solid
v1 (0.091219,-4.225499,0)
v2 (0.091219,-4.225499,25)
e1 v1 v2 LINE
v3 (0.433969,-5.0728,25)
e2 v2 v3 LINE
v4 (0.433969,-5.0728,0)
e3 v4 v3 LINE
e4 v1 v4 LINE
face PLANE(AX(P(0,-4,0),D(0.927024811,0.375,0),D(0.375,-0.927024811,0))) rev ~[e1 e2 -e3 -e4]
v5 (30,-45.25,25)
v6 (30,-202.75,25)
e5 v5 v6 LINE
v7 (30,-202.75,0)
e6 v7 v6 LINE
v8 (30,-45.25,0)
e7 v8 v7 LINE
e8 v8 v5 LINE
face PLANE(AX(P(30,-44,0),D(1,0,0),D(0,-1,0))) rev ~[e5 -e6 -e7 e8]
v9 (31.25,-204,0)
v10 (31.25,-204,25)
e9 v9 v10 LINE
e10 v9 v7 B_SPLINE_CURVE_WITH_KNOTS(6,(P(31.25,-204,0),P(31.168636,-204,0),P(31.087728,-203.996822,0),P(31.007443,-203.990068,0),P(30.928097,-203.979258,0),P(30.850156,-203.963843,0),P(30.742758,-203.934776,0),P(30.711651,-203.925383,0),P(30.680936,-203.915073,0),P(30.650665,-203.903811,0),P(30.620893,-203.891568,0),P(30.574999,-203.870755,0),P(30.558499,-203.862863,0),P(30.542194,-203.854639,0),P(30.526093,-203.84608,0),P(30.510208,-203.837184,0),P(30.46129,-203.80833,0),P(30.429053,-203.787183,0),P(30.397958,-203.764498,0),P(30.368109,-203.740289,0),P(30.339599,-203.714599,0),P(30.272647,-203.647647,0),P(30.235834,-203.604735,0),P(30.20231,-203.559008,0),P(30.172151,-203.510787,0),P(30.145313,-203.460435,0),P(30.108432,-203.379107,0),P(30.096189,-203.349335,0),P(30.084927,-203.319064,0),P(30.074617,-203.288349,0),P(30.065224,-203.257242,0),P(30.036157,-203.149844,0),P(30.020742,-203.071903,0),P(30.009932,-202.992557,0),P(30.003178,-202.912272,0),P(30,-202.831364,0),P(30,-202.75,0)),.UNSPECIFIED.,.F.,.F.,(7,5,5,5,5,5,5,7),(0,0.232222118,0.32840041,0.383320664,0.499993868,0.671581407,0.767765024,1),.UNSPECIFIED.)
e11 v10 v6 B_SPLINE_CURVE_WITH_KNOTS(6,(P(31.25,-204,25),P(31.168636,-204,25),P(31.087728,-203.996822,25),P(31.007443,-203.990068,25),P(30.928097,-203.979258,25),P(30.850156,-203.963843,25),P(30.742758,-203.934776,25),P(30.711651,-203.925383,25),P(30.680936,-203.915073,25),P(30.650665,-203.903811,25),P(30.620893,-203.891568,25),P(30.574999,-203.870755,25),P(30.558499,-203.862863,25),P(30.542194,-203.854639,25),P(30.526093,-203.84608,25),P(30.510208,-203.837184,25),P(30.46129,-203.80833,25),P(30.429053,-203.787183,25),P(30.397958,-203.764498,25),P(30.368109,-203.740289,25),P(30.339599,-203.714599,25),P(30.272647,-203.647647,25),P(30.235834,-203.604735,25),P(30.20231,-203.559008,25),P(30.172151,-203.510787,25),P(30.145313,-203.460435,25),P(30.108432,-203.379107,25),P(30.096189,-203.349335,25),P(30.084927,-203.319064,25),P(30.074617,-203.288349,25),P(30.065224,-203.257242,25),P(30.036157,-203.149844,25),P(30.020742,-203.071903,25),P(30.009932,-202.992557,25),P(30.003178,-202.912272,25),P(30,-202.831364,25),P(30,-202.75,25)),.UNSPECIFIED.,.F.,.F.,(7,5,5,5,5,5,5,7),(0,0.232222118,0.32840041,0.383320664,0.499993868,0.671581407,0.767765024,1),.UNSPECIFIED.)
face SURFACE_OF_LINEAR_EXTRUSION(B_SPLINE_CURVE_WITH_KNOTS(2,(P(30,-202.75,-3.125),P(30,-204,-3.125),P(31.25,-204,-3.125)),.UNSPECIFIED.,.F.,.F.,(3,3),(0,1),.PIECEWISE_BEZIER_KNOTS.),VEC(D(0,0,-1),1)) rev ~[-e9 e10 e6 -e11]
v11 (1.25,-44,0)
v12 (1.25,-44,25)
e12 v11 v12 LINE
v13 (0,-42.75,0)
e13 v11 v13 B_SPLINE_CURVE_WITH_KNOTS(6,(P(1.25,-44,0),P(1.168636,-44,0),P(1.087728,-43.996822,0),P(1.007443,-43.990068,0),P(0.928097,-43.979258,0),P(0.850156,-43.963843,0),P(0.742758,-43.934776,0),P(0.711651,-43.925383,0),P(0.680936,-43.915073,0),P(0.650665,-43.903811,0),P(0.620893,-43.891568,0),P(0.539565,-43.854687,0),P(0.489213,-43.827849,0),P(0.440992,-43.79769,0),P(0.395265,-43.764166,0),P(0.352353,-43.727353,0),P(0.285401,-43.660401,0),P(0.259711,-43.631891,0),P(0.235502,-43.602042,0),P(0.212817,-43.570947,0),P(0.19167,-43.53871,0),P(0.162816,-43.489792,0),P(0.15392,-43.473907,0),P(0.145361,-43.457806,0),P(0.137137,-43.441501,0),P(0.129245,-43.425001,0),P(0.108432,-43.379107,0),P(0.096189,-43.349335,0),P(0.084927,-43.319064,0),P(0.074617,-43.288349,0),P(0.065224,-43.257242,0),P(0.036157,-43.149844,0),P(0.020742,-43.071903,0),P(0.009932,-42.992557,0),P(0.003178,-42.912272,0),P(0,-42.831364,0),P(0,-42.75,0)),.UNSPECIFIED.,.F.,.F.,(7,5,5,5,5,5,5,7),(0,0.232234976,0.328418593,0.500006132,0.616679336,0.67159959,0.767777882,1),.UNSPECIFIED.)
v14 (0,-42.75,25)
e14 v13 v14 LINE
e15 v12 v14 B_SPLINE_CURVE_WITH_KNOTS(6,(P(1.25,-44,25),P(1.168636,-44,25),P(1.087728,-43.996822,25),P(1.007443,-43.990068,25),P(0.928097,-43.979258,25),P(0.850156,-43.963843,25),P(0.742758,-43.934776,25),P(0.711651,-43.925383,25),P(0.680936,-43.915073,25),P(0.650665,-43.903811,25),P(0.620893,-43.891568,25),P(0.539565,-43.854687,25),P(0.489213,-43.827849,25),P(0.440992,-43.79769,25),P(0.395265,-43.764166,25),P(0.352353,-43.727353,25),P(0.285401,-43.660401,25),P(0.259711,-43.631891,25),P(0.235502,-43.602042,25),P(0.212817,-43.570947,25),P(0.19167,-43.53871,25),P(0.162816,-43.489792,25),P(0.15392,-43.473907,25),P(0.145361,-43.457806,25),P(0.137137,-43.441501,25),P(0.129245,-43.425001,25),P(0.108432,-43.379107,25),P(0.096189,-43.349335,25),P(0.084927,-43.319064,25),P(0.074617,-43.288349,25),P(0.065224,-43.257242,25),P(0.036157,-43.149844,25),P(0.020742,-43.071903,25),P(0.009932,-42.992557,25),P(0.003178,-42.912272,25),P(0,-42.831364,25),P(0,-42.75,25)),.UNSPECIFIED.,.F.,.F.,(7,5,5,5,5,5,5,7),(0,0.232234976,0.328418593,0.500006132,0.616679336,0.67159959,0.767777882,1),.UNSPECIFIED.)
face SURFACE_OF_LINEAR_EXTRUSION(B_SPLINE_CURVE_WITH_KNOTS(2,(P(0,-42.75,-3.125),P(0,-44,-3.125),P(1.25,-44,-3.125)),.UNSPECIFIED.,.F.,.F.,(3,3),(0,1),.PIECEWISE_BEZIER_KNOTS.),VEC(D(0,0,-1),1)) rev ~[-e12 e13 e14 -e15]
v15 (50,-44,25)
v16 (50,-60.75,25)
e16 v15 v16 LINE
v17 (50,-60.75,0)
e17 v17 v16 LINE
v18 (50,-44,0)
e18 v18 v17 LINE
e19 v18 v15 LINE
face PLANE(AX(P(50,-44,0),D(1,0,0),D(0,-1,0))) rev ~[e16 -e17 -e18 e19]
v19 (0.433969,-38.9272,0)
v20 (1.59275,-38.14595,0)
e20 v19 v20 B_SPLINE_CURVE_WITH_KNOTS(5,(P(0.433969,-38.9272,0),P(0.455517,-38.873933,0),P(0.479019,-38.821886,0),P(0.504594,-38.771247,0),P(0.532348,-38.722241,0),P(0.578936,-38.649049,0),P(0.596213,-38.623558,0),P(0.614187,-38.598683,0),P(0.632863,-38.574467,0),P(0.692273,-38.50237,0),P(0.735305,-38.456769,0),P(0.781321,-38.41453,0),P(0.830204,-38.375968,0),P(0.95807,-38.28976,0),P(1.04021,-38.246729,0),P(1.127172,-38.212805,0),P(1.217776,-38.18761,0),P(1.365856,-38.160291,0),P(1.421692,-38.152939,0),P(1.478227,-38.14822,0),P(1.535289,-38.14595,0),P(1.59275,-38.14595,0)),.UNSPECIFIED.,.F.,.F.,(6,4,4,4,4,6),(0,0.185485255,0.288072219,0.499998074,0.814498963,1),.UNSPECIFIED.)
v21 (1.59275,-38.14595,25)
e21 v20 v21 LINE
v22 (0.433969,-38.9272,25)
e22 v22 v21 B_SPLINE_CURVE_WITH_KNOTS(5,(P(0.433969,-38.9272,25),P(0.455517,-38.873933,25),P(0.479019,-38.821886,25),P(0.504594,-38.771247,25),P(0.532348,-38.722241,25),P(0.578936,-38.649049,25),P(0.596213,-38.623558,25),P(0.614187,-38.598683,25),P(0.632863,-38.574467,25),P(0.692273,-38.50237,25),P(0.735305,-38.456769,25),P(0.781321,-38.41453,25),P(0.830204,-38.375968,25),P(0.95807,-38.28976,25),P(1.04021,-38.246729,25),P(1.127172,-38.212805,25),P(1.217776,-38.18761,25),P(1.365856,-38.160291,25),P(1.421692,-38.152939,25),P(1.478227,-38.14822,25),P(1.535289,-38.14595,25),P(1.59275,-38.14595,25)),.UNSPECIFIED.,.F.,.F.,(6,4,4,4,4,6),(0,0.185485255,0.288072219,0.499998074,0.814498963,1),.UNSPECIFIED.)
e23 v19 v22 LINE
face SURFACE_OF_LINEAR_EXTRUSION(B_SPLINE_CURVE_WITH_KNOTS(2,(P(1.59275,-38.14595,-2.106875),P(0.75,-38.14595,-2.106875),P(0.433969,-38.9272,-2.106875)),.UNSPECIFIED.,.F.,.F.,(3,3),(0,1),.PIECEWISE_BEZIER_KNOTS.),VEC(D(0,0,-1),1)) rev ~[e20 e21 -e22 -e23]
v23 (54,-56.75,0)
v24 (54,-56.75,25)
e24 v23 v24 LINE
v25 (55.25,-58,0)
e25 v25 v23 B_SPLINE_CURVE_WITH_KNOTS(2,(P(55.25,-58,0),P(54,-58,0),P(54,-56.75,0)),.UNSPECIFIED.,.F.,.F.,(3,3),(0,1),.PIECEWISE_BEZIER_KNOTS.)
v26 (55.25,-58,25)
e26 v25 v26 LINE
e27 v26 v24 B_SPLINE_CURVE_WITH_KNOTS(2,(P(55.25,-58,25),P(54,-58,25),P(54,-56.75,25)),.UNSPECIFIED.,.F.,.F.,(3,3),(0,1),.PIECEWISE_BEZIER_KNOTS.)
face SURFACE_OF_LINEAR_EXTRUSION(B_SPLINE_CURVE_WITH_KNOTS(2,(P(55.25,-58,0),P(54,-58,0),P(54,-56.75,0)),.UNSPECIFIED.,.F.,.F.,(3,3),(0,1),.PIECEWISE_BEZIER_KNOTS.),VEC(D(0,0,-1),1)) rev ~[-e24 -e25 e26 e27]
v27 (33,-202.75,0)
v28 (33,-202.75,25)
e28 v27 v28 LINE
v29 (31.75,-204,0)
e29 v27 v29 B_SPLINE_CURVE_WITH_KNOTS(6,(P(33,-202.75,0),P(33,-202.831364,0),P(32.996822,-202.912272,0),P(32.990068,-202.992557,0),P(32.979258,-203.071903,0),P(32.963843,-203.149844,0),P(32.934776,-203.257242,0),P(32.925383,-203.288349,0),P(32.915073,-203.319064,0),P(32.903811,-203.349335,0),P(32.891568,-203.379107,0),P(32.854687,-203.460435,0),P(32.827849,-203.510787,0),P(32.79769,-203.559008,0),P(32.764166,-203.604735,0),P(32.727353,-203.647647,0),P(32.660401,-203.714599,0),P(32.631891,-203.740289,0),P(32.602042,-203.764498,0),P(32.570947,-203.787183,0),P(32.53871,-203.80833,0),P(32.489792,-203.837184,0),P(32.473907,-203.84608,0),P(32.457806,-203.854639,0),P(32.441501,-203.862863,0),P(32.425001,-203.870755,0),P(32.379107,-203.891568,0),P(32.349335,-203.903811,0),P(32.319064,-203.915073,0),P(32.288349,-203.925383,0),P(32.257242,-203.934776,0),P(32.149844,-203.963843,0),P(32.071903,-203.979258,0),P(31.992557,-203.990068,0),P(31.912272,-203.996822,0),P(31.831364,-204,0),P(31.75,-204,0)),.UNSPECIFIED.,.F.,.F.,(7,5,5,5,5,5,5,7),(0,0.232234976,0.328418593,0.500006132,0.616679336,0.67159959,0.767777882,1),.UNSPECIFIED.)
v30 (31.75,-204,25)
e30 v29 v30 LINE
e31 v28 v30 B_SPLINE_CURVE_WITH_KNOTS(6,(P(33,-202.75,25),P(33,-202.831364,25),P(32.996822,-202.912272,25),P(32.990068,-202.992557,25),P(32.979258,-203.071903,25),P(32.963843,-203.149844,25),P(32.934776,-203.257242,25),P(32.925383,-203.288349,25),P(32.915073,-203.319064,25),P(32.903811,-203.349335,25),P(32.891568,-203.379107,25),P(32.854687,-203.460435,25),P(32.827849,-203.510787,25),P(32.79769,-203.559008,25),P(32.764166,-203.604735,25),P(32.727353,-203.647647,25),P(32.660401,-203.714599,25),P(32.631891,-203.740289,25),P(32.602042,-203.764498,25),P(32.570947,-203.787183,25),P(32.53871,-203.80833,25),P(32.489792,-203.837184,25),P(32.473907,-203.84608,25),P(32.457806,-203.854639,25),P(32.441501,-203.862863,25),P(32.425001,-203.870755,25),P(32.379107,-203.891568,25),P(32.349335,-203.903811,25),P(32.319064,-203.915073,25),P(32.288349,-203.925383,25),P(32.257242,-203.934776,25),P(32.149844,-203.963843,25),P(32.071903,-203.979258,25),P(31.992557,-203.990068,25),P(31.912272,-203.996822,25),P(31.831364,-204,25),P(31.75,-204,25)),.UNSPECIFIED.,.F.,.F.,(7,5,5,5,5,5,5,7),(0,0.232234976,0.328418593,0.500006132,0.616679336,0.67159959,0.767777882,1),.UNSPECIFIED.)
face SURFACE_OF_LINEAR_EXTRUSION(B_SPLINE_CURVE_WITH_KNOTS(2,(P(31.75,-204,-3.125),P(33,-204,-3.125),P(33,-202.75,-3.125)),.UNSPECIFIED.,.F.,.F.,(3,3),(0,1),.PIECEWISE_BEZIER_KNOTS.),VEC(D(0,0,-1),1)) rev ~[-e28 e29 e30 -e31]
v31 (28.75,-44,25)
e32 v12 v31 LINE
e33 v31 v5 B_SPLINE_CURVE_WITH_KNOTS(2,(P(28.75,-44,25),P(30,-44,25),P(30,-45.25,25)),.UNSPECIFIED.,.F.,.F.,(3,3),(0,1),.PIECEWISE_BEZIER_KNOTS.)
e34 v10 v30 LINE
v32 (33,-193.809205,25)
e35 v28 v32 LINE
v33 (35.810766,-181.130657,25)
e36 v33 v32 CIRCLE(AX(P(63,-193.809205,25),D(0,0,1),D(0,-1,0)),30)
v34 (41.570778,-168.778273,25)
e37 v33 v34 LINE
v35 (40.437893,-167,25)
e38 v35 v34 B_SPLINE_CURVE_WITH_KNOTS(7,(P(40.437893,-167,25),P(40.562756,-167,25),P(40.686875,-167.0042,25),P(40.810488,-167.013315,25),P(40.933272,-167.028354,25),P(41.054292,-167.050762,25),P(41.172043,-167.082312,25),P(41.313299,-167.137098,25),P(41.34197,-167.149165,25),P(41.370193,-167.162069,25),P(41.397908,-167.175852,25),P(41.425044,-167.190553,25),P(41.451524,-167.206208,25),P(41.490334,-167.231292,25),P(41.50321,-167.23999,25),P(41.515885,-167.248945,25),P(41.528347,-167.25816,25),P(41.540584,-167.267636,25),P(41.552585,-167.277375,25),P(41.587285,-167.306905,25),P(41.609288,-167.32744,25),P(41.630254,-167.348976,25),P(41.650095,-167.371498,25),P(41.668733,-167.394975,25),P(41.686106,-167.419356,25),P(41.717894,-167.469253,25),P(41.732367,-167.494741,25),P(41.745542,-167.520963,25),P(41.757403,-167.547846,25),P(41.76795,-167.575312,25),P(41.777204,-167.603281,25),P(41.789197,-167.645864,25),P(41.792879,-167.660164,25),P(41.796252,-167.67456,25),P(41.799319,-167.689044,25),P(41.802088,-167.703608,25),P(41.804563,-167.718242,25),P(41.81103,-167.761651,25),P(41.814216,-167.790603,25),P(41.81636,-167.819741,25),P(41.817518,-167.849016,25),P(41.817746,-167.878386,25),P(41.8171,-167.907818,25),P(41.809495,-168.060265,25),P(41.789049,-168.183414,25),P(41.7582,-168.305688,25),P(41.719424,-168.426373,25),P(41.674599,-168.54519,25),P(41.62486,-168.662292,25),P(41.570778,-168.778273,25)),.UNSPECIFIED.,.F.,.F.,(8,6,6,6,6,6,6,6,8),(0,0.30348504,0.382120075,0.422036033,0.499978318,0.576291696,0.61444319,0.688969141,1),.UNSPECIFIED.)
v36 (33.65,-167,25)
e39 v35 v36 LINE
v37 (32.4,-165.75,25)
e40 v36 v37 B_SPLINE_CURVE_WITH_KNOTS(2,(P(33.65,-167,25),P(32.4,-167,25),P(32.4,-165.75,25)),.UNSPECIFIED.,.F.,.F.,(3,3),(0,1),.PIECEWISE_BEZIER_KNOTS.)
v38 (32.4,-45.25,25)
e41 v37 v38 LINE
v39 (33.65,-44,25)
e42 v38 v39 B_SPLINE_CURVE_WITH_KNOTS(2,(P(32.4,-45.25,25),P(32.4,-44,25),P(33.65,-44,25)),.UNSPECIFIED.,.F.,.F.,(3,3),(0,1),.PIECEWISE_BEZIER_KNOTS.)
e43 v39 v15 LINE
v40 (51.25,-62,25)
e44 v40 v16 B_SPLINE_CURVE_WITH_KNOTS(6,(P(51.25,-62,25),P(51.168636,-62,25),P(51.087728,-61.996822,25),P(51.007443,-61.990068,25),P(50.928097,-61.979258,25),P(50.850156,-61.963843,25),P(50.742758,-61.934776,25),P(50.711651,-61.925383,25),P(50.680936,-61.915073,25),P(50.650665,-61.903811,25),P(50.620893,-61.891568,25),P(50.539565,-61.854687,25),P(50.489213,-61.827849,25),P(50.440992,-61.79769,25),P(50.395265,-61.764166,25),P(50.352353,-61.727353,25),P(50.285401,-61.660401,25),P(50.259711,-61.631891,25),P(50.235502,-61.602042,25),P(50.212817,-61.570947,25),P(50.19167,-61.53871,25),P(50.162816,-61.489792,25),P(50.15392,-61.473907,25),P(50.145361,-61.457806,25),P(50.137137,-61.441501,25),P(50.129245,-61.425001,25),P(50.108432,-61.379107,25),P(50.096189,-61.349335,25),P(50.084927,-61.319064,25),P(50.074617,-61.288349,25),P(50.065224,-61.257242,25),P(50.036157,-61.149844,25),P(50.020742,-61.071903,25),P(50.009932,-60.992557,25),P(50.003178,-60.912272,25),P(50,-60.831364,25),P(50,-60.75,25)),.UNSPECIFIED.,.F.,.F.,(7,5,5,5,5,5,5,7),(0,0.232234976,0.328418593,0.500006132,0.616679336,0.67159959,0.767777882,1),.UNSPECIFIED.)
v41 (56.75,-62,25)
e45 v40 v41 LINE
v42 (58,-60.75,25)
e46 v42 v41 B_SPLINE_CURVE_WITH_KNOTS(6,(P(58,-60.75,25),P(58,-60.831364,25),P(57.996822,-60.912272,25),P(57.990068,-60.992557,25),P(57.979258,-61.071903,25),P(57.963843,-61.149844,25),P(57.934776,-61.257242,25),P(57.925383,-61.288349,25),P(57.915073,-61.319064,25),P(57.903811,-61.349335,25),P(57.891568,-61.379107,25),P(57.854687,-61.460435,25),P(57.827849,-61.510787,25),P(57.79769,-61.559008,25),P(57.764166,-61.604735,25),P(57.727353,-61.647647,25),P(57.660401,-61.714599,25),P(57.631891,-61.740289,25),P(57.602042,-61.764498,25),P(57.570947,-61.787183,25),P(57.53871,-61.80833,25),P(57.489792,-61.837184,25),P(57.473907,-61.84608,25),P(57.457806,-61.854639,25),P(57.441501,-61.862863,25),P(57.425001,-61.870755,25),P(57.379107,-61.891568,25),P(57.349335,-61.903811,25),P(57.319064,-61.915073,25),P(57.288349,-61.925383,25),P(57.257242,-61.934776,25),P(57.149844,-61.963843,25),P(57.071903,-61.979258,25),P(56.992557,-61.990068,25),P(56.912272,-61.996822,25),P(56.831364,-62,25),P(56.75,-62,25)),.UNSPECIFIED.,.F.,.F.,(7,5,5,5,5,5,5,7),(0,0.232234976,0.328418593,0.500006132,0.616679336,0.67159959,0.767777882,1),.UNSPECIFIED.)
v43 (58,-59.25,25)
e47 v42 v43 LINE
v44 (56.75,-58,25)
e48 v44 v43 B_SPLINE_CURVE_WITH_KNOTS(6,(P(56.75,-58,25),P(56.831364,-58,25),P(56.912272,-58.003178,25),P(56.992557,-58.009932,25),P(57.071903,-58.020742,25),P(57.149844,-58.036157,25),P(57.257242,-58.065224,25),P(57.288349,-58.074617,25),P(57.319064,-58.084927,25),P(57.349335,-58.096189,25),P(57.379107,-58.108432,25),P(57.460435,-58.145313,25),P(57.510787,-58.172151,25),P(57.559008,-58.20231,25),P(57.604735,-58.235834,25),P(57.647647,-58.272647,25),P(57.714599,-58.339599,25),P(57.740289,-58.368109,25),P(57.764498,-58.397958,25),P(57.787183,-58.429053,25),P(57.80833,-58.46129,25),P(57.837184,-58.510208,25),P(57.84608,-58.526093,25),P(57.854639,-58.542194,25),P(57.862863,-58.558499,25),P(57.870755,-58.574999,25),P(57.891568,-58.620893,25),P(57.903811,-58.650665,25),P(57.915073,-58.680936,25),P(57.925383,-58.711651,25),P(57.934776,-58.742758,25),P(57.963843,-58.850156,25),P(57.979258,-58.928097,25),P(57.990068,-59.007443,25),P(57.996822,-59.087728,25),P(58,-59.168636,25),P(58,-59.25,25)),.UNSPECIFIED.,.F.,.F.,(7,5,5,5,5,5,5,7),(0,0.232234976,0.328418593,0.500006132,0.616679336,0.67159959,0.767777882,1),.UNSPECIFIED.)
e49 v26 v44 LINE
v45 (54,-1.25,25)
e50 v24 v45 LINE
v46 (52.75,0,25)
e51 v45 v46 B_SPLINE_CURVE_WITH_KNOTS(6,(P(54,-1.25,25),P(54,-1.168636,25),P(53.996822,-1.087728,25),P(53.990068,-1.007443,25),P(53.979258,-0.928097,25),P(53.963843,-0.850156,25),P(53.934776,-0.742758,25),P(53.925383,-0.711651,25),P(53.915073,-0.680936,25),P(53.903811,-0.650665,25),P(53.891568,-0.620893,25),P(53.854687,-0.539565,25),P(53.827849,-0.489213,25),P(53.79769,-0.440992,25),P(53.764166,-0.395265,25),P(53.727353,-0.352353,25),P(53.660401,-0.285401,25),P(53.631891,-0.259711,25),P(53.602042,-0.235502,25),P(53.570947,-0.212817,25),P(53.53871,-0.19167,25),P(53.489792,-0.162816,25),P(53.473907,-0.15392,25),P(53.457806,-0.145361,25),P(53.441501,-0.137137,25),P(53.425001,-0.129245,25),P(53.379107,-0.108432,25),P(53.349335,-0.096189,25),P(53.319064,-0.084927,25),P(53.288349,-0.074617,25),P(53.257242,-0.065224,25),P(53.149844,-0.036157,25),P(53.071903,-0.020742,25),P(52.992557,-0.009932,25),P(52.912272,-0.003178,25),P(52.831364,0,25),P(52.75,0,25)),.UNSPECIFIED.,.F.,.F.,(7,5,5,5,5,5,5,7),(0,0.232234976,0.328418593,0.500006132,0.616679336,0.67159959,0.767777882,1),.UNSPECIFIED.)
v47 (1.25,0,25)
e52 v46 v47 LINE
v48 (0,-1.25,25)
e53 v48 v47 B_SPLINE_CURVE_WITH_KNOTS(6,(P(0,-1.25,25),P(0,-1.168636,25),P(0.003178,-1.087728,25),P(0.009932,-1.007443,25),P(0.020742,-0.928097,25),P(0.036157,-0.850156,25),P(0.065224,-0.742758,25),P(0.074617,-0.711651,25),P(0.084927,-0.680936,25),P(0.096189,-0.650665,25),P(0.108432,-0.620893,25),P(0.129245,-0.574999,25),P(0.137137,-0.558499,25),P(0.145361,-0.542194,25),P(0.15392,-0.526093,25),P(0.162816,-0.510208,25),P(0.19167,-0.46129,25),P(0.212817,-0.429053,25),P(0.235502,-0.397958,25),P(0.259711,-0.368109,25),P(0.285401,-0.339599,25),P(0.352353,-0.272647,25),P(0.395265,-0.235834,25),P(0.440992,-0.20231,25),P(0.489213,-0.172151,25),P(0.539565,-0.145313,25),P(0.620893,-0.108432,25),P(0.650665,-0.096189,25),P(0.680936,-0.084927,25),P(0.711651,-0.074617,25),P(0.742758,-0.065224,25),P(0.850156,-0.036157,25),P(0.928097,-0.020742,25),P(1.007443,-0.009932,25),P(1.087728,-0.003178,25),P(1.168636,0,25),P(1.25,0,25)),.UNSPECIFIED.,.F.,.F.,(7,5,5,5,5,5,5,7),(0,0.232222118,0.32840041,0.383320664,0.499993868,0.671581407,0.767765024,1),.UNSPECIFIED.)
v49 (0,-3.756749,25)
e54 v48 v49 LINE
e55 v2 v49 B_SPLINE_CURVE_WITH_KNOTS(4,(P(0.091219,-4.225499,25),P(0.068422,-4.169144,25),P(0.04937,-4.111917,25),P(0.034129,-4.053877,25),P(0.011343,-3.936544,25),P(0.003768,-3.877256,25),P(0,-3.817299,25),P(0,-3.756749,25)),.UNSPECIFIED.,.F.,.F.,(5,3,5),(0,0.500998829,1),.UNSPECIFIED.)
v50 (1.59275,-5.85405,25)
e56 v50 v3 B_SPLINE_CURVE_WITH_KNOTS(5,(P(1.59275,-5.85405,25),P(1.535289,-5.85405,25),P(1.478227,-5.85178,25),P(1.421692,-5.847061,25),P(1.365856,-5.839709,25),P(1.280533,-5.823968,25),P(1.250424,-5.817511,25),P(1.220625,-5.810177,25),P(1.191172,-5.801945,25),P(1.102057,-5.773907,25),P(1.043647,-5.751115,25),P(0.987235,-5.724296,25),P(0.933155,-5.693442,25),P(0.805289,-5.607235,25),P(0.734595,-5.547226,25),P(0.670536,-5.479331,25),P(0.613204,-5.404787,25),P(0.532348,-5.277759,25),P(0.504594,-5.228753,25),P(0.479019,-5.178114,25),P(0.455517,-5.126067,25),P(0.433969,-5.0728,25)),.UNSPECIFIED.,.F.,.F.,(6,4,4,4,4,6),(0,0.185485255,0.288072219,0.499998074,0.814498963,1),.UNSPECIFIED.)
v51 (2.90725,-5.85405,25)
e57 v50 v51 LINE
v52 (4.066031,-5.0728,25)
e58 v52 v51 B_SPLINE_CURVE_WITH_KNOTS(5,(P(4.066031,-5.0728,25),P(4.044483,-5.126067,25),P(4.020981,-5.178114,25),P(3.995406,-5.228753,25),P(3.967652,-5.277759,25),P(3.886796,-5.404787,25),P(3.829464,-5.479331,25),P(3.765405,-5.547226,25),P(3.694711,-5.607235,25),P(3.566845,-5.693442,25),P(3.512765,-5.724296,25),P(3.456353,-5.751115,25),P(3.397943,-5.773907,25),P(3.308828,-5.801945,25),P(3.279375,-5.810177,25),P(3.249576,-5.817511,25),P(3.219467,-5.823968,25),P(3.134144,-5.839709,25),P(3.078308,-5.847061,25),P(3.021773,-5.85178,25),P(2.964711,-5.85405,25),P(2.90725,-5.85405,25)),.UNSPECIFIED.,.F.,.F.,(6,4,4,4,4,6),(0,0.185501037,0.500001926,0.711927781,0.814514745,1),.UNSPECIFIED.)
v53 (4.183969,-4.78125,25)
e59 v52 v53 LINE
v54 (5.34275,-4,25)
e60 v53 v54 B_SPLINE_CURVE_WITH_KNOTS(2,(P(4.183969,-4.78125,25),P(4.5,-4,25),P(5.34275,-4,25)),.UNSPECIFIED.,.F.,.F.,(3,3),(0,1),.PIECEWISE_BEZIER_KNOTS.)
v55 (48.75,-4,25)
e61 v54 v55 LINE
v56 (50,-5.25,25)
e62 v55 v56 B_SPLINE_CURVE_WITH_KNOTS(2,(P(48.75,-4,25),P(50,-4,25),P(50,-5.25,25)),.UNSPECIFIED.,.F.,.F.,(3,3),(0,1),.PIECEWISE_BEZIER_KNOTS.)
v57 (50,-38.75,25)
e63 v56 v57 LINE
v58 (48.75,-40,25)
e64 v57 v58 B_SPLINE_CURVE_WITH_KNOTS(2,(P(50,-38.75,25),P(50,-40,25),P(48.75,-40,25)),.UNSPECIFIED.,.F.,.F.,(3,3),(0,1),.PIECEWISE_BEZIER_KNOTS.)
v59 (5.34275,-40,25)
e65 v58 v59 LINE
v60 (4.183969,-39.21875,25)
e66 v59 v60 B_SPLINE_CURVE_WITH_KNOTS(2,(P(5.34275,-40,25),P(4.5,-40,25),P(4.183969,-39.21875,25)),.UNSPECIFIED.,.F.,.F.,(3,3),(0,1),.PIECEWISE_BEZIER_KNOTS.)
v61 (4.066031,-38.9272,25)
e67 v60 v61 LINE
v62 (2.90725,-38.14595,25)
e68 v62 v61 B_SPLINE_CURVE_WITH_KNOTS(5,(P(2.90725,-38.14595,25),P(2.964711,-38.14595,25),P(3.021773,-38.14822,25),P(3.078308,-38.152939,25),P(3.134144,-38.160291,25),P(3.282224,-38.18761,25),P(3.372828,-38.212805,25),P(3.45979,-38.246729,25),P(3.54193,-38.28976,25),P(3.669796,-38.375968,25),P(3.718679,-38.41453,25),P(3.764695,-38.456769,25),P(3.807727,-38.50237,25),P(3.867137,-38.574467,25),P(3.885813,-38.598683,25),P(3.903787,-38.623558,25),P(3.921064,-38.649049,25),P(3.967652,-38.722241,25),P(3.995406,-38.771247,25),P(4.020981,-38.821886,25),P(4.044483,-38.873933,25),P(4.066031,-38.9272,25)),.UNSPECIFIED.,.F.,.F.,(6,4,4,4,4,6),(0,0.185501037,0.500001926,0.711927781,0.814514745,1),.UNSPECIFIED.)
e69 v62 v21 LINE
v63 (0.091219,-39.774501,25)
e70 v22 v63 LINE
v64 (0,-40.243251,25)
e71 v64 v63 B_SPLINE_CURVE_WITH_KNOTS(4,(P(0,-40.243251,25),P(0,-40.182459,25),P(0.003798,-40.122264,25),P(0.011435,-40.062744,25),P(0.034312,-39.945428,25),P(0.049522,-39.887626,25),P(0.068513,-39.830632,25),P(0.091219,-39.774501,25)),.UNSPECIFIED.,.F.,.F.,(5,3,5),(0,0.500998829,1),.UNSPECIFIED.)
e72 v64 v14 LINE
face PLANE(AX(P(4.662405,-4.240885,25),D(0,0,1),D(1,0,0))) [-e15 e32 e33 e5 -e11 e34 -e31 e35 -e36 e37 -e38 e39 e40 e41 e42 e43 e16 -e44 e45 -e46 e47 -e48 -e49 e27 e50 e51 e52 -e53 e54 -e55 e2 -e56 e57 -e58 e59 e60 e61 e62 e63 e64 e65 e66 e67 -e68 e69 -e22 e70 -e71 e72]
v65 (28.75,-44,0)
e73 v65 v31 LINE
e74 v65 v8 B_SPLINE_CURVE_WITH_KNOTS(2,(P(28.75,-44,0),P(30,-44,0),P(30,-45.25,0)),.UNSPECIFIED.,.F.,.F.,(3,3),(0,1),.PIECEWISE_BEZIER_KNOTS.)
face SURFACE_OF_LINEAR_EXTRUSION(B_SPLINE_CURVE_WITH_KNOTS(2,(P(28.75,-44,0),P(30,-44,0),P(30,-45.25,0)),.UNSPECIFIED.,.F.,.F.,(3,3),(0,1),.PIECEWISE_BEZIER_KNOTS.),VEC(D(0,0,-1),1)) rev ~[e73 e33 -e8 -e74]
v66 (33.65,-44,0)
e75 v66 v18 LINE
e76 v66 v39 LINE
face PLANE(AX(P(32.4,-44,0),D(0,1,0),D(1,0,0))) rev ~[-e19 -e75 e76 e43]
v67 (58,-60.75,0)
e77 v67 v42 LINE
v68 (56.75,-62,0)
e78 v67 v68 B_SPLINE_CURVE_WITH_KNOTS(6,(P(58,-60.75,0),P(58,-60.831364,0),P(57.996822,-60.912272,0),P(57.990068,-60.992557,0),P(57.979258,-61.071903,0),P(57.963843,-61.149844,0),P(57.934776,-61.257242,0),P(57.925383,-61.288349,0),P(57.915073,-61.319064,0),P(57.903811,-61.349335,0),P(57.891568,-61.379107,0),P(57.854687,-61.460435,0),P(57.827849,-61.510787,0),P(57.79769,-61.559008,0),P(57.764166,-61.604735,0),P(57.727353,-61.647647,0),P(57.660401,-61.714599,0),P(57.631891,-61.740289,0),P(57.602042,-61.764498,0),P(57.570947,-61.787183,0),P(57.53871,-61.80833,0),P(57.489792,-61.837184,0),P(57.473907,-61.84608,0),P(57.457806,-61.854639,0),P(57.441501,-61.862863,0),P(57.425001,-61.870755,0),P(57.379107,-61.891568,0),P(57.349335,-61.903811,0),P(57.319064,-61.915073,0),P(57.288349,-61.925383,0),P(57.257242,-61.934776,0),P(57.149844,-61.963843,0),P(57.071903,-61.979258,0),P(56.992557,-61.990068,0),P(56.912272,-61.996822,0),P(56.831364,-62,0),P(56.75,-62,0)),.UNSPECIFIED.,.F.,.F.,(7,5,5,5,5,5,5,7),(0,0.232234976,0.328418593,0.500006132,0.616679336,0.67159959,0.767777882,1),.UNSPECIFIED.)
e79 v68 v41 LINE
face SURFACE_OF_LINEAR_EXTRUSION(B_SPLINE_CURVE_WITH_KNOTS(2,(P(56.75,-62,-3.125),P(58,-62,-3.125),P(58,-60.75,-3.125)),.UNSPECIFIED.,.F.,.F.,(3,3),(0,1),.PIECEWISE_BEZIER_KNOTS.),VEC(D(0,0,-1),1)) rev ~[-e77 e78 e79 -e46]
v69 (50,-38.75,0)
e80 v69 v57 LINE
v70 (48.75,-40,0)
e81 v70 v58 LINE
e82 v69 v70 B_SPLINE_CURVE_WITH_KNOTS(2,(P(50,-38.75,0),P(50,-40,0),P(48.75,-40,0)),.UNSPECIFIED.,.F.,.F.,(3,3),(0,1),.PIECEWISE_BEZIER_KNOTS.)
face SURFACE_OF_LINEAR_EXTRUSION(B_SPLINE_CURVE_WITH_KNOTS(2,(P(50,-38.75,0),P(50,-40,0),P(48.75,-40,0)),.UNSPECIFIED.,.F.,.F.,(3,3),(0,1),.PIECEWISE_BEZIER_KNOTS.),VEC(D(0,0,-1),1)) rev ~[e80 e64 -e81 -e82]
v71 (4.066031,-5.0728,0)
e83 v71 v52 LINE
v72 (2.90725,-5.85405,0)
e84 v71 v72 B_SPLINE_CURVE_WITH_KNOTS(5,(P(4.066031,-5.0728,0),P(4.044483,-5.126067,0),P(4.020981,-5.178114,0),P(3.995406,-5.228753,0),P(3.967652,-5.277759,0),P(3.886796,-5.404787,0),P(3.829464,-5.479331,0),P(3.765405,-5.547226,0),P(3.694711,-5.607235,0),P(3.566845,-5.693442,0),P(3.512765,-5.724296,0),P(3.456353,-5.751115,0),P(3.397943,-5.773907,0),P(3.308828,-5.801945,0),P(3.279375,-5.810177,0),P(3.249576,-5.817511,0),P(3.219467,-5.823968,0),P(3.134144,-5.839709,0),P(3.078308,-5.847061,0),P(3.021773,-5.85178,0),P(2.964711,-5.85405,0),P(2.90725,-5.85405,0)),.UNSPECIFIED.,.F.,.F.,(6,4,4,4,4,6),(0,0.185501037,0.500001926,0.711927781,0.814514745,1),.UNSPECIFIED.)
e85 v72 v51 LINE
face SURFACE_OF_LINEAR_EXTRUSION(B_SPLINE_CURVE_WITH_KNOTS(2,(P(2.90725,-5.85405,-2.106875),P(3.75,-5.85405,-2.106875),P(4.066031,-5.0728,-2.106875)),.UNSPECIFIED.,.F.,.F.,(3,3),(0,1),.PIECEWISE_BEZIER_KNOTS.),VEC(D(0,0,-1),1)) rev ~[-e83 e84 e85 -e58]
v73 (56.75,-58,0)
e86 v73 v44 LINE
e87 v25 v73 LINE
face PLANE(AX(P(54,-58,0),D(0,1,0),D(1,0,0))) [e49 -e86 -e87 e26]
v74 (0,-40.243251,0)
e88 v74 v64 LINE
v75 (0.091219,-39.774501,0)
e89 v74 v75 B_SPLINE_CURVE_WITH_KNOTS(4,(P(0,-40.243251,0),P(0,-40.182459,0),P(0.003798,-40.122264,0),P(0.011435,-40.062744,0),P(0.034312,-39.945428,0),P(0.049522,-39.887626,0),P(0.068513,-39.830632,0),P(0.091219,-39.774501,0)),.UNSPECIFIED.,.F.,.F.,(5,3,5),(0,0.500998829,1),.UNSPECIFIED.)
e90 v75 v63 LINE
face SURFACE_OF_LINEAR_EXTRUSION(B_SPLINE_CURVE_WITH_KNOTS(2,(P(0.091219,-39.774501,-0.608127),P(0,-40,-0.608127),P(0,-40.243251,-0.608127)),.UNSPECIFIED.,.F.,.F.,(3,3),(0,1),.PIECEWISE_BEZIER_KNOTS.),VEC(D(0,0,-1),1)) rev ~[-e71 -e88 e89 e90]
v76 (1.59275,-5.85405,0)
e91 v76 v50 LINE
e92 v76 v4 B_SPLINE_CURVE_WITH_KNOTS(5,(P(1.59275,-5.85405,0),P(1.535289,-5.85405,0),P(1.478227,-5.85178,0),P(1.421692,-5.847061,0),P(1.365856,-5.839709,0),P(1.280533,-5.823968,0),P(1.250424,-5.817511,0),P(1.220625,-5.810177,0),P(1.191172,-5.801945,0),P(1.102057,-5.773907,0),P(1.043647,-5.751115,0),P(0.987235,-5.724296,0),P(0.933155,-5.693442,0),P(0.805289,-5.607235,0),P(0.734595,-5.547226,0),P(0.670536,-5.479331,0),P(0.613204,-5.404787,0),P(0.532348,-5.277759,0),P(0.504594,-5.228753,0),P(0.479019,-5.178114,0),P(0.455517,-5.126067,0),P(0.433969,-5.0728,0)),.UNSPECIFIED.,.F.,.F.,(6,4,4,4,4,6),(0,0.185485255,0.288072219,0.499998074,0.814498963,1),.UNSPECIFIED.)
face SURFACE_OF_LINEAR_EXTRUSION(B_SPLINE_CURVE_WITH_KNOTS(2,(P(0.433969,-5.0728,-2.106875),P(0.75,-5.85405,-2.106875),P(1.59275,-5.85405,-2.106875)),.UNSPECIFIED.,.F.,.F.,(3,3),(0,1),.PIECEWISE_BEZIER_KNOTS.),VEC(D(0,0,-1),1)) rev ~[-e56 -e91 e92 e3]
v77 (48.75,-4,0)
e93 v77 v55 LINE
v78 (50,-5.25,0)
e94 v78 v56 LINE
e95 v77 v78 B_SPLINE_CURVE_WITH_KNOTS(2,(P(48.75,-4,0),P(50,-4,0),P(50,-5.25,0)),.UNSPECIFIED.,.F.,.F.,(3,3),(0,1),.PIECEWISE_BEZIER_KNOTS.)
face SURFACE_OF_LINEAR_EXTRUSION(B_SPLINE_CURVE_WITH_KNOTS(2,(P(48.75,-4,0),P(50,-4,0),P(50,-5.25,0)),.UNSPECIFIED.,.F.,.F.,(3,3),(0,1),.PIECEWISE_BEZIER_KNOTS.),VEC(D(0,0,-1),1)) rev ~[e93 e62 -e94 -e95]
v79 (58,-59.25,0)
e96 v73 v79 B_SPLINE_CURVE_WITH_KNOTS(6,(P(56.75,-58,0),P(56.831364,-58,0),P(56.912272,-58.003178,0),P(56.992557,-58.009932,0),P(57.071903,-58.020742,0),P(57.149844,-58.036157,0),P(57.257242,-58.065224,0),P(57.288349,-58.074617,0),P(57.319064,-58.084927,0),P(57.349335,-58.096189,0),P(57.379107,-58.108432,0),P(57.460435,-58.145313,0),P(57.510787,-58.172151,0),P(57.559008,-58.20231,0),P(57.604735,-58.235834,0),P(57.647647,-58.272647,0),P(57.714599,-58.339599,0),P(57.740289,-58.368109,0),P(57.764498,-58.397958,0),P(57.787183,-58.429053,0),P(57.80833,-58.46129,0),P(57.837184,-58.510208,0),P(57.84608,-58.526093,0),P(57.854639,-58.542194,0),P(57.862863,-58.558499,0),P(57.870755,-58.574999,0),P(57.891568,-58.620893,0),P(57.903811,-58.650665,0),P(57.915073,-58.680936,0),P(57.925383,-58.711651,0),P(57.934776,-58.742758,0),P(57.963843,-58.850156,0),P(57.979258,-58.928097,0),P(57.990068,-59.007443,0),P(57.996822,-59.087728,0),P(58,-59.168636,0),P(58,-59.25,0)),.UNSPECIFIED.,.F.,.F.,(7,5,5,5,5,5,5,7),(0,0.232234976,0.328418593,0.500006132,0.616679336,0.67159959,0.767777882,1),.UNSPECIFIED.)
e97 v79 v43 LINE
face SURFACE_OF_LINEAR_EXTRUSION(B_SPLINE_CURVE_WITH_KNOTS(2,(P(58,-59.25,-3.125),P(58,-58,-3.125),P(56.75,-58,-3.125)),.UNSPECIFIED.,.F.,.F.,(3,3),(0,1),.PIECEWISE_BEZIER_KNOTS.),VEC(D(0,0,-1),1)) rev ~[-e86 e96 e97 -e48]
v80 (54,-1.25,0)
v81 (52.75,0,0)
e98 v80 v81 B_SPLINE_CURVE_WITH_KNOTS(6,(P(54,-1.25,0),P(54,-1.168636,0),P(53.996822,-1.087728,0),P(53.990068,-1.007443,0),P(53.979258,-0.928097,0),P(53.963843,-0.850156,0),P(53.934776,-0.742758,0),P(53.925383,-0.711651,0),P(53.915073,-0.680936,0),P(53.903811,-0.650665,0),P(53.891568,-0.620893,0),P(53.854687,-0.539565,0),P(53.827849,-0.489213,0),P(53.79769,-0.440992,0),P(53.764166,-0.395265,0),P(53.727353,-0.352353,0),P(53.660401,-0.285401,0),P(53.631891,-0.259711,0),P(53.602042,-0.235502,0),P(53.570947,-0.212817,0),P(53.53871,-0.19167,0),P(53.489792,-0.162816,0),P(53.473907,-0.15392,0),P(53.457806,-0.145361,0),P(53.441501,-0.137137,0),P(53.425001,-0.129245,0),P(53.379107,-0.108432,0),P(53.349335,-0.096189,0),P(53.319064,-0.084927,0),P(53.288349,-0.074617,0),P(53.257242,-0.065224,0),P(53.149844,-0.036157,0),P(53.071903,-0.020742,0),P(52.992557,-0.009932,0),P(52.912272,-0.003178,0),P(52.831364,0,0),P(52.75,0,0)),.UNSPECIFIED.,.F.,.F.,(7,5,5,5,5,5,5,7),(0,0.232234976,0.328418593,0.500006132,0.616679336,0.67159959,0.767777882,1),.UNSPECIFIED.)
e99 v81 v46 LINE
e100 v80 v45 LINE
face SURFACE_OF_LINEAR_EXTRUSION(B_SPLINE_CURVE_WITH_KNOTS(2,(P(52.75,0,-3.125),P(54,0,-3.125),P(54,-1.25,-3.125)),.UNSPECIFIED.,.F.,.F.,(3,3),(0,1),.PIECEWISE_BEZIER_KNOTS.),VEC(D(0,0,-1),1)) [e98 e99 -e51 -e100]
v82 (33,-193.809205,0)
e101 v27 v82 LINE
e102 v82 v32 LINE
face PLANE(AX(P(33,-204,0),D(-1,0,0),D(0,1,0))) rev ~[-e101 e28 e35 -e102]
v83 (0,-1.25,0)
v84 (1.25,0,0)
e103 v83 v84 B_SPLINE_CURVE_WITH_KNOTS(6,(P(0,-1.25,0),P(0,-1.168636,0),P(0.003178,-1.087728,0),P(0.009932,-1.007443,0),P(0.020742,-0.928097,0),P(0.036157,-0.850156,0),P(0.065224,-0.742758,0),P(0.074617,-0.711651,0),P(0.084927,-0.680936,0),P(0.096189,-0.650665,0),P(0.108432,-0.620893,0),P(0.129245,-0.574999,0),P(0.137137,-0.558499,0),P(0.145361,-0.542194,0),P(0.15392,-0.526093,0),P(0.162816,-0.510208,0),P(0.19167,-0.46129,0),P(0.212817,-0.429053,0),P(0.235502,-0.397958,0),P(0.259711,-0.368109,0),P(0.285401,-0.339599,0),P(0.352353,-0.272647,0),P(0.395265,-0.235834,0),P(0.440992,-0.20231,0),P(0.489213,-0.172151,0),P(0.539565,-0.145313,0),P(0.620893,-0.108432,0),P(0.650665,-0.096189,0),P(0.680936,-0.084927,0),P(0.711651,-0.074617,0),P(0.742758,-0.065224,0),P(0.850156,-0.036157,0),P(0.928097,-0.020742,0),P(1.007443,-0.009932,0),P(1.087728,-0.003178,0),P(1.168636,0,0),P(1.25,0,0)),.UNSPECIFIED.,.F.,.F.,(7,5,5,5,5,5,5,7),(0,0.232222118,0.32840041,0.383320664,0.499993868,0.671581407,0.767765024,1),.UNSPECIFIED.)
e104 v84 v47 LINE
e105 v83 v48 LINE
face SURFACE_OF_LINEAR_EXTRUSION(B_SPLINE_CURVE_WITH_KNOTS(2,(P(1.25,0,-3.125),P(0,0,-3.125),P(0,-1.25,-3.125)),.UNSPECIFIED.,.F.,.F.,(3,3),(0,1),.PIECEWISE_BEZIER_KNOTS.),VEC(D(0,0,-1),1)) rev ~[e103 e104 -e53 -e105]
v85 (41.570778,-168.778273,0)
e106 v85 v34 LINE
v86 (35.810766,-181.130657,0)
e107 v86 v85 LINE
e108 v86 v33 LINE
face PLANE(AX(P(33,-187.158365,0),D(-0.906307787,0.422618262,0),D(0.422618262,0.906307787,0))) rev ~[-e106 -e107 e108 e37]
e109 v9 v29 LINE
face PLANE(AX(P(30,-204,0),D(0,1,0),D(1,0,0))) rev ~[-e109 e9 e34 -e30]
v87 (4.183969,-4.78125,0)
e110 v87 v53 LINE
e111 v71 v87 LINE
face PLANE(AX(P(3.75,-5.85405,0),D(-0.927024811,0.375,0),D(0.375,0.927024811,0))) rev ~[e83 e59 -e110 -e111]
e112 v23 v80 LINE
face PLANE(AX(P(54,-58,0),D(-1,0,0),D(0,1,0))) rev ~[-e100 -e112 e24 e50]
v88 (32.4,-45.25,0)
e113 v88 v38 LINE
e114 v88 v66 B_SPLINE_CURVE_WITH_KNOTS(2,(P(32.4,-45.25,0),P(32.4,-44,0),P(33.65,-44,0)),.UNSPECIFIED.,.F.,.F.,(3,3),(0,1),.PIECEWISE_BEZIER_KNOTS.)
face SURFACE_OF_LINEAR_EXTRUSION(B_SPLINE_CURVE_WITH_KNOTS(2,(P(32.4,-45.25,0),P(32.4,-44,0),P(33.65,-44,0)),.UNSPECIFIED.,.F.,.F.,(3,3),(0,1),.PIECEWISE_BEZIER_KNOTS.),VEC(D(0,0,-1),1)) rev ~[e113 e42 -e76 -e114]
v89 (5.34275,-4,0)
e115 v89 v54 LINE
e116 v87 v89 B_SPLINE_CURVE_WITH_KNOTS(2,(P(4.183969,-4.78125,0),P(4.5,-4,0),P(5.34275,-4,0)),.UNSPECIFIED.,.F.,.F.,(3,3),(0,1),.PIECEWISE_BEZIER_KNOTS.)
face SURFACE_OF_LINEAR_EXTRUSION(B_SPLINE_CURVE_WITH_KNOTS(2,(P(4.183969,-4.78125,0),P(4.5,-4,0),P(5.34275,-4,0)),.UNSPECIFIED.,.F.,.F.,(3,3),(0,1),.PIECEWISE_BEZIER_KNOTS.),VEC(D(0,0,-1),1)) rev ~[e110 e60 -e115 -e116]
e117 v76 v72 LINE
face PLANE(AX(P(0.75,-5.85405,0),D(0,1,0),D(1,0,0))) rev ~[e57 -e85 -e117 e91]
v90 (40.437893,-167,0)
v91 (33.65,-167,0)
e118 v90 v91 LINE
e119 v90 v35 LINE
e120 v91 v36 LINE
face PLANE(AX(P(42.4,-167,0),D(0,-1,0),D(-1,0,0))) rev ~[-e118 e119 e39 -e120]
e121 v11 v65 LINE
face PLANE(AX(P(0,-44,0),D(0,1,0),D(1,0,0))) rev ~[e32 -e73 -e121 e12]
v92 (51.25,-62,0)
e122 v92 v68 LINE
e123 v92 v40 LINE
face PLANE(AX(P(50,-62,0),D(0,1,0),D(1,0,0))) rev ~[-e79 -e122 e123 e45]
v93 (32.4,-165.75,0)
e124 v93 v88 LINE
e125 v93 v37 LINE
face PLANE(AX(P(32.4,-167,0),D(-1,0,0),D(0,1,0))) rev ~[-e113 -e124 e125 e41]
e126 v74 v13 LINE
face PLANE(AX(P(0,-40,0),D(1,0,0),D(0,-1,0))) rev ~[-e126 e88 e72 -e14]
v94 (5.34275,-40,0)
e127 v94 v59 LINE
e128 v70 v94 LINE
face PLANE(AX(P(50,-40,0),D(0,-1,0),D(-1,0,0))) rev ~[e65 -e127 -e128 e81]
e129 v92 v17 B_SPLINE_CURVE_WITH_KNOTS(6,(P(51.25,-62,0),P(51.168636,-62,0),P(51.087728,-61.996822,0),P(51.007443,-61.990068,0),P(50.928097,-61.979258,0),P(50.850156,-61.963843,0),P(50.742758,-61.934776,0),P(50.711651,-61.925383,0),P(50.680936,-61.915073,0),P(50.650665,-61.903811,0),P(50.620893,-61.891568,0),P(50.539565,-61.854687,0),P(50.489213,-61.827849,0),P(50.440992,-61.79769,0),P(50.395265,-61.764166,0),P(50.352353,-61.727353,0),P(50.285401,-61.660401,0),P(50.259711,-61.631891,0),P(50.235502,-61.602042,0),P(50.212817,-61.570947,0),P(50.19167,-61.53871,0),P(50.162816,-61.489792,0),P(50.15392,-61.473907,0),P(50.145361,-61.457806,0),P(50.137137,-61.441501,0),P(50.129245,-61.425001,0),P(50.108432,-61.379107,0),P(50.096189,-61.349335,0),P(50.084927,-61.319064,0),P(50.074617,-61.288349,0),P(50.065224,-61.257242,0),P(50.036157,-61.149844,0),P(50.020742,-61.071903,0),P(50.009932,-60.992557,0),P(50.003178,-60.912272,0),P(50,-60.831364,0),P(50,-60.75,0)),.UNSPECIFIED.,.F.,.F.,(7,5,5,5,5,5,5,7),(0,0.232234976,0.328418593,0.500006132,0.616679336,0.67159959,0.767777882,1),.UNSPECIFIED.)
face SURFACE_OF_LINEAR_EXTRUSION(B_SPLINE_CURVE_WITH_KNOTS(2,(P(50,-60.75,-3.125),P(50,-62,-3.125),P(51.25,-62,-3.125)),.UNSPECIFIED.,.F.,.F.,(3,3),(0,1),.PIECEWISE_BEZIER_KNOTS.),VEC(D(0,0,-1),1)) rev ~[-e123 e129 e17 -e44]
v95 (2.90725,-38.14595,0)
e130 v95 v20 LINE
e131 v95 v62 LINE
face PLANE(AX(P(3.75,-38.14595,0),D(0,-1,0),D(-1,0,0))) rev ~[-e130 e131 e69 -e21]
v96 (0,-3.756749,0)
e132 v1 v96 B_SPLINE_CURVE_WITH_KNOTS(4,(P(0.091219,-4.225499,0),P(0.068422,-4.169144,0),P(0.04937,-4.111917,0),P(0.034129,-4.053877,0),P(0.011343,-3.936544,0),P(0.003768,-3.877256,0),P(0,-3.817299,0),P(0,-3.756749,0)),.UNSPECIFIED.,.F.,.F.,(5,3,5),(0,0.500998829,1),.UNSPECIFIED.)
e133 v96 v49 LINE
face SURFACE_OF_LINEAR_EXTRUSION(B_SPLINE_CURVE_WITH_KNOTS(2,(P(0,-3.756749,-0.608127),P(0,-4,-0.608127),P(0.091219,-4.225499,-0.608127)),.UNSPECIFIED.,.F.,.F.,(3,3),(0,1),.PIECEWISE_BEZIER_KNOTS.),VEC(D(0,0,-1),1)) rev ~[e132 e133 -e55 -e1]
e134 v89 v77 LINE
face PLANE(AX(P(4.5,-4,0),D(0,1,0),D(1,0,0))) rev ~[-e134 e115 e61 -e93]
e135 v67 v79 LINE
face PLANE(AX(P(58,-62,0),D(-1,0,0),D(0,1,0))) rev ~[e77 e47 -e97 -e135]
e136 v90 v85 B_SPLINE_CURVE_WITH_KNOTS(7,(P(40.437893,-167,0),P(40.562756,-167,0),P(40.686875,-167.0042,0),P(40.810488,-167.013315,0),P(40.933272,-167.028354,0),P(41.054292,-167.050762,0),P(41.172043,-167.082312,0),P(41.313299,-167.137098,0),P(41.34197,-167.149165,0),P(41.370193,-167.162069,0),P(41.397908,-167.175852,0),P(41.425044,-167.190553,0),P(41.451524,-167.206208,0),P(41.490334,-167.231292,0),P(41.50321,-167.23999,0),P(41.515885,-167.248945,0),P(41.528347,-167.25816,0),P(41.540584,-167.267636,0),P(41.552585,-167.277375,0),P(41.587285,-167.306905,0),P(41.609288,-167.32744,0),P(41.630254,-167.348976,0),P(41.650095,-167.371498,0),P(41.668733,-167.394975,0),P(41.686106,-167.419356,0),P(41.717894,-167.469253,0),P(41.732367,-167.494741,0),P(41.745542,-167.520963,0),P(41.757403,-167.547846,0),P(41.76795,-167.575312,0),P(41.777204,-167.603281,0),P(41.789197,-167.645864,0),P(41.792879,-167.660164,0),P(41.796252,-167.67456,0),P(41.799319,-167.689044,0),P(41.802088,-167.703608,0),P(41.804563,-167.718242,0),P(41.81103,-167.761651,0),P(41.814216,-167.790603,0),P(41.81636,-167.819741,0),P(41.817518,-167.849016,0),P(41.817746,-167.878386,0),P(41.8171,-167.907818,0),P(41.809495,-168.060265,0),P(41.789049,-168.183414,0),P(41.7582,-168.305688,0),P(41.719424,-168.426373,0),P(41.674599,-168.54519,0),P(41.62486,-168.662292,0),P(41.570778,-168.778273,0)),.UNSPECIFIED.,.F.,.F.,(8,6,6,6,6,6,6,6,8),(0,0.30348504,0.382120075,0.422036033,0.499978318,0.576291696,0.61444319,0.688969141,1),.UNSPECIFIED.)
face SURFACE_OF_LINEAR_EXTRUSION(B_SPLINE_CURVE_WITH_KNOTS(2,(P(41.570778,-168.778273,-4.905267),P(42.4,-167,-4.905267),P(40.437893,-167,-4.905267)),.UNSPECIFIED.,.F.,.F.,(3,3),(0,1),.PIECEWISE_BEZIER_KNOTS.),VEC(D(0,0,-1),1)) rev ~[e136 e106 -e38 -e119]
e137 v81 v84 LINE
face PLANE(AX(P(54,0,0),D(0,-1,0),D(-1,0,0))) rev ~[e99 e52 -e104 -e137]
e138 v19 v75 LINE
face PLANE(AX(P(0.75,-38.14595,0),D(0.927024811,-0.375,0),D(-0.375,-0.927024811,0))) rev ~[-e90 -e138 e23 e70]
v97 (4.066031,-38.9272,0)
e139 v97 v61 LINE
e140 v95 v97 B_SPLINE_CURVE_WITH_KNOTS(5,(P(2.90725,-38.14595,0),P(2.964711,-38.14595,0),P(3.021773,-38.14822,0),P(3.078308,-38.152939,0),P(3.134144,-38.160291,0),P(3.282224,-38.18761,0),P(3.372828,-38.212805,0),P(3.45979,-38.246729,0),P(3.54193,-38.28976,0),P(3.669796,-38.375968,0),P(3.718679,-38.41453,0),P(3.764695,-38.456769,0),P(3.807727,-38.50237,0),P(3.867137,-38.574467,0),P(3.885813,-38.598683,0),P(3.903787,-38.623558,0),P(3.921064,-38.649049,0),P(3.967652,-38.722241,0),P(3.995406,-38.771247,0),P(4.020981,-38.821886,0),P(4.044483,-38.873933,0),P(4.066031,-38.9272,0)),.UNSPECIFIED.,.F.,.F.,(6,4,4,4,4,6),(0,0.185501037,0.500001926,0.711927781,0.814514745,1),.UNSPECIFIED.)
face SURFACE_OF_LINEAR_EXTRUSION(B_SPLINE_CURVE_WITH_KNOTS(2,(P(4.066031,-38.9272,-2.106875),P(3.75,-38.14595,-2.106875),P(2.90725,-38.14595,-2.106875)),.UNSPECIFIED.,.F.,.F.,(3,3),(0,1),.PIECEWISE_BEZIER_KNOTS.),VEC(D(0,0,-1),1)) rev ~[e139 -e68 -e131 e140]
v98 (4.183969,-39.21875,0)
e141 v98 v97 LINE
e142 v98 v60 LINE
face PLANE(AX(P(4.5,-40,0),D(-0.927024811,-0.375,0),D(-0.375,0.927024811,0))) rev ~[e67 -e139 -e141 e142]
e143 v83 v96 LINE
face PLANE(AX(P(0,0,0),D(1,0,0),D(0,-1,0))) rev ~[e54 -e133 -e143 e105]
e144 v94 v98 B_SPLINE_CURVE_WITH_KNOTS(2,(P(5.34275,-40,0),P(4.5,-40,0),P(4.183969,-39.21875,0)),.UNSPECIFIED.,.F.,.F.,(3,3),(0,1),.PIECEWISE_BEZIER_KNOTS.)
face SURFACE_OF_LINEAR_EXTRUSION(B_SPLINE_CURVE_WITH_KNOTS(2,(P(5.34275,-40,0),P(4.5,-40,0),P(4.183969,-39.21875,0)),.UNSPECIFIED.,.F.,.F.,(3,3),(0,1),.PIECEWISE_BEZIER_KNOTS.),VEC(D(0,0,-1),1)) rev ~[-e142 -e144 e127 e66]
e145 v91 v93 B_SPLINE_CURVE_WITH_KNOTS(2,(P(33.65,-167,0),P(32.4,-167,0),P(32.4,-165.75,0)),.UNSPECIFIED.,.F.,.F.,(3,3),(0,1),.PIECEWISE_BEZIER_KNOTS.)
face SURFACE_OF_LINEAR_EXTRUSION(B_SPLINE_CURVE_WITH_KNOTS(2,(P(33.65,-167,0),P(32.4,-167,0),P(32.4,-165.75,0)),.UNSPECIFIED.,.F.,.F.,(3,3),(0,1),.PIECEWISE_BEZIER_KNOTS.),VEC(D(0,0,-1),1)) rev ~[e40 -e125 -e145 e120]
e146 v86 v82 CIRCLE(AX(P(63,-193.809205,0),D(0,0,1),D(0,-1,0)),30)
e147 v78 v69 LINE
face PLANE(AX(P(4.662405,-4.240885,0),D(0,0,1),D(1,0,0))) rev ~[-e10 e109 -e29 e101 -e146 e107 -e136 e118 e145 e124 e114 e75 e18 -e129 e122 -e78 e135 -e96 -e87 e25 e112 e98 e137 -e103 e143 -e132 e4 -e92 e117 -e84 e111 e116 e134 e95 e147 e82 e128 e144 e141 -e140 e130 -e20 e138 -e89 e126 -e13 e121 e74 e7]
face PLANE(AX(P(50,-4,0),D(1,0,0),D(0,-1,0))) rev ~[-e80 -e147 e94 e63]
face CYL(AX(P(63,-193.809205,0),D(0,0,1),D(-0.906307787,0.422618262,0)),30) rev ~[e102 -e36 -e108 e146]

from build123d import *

# Parameters (mm, degrees)
F0_W        = 4
F0_H        = 4
F1_DEPTH    = 25
F2_T1_DEPTH = 25
F2_T3_DEPTH = 31.25
F2_T5_DEPTH = 29.2137491404
F2_T7_DEPTH = 26.2162531519
F2_T9_DEPTH = 34.810534857
F3_R        = 30


# Not quite as in the source:
# - a fillet or chamfer that OpenCascade refuses, or shapes differently, is made with other operations: its cross-section is extruded or revolved along the edge and cut away or added


with BuildPart() as f1:
    # F0 (on Top) → F1 (new body)
    with BuildSketch(Plane.XY):
        Polygon((54, 0), (0, 0), (0, -4), (4.5, -4), (50, -4), (50, -40), (4.5, -40), (0, -40), (0, -44), (30, -44), (30, -204), (33, -204), (33, -187.1583650528), (42.4, -167), (32.4, -167), (32.4, -44), (50, -44), (50, -62), (54, -62), (54, -58), align=None)
        Polygon((4.5, -4), (0, -4), (0.75, -5.8540496218), (3.75, -5.8540496218), align=None)
        with Locations((56, -60)):
            Rectangle(F0_W, F0_H)
        Polygon((0, -40), (4.5, -40), (3.75, -38.1459503782), (0.75, -38.1459503782), align=None)
    extrude(amount=F1_DEPTH)

    # F2: fillet of radius 1.25 on 23 edges, made by hand

    # F2_s2 → F2_t1 (join)
    with BuildSketch(Plane.XY):
        with BuildLine():
            add(Edge.make_bspline(
                [(4.1839688145, -4.78125), (4.5, -4), (5.3427498281, -4)],
                knots=[0, 0, 0, 1, 1, 1], degree=2, weights=[1, 1, 1]))
            Line((5.3427498281, -4), (4.5, -4))
            Line((4.5, -4), (4.1839688145, -4.78125))
        make_face()
        with BuildLine():
            add(Edge.make_bspline(
                [(5.3427498281, -40), (4.5, -40), (4.1839688145, -39.21875)],
                knots=[0, 0, 0, 1, 1, 1], degree=2, weights=[1, 1, 1]))
            Line((4.1839688145, -39.21875), (4.5, -40))
            Line((4.5, -40), (5.3427498281, -40))
        make_face()
        with BuildLine():
            add(Edge.make_bspline(
                [(50, -38.75), (50, -40), (48.75, -40)],
                knots=[0, 0, 0, 1, 1, 1], degree=2, weights=[1, 1, 1]))
            Line((48.75, -40), (50, -40))
            Line((50, -40), (50, -38.75))
        make_face()
        with BuildLine():
            add(Edge.make_bspline(
                [(48.75, -4), (50, -4), (50, -5.25)],
                knots=[0, 0, 0, 1, 1, 1], degree=2, weights=[1, 1, 1]))
            Line((50, -5.25), (50, -4))
            Line((50, -4), (48.75, -4))
        make_face()
        with BuildLine():
            add(Edge.make_bspline(
                [(55.25, -58), (54, -58), (54, -56.75)],
                knots=[0, 0, 0, 1, 1, 1], degree=2, weights=[1, 1, 1]))
            Line((54, -56.75), (54, -58))
            Line((54, -58), (55.25, -58))
        make_face()
        with BuildLine():
            add(Edge.make_bspline(
                [(28.75, -44), (30, -44), (30, -45.25)],
                knots=[0, 0, 0, 1, 1, 1], degree=2, weights=[1, 1, 1]))
            Line((30, -45.25), (30, -44))
            Line((30, -44), (28.75, -44))
        make_face()
        with BuildLine():
            add(Edge.make_bspline(
                [(32.4, -45.25), (32.4, -44), (33.65, -44)],
                knots=[0, 0, 0, 1, 1, 1], degree=2, weights=[1, 1, 1]))
            Line((33.65, -44), (32.4, -44))
            Line((32.4, -44), (32.4, -45.25))
        make_face()
        with BuildLine():
            add(Edge.make_bspline(
                [(33.65, -167), (32.4, -167), (32.4, -165.75)],
                knots=[0, 0, 0, 1, 1, 1], degree=2, weights=[1, 1, 1]))
            Line((32.4, -165.75), (32.4, -167))
            Line((32.4, -167), (33.65, -167))
        make_face()
    extrude(amount=F2_T1_DEPTH)

    # F2_s4 → F2_t3 (cut)
    with BuildSketch(Plane.XY.offset(-3.125)):
        with BuildLine():
            add(Edge.make_bspline(
                [(31.75, -204), (33, -204), (33, -202.75)],
                knots=[0, 0, 0, 1, 1, 1], degree=2, weights=[1, 1, 1]))
            Line((33, -202.75), (33, -204))
            Line((33, -204), (31.75, -204))
        make_face()
        with BuildLine():
            add(Edge.make_bspline(
                [(30, -202.75), (30, -204), (31.25, -204)],
                knots=[0, 0, 0, 1, 1, 1], degree=2, weights=[1, 1, 1]))
            Line((31.25, -204), (30, -204))
            Line((30, -204), (30, -202.75))
        make_face()
        with BuildLine():
            add(Edge.make_bspline(
                [(1.25, 0), (0, 0), (0, -1.25)],
                knots=[0, 0, 0, 1, 1, 1], degree=2, weights=[1, 1, 1]))
            Line((0, -1.25), (0, 0))
            Line((0, 0), (1.25, 0))
        make_face()
        with BuildLine():
            add(Edge.make_bspline(
                [(0, -42.75), (0, -44), (1.25, -44)],
                knots=[0, 0, 0, 1, 1, 1], degree=2, weights=[1, 1, 1]))
            Line((1.25, -44), (0, -44))
            Line((0, -44), (0, -42.75))
        make_face()
        with BuildLine():
            add(Edge.make_bspline(
                [(52.75, 0), (54, 0), (54, -1.25)],
                knots=[0, 0, 0, 1, 1, 1], degree=2, weights=[1, 1, 1]))
            Line((54, -1.25), (54, 0))
            Line((54, 0), (52.75, 0))
        make_face()
        with BuildLine():
            add(Edge.make_bspline(
                [(58, -59.25), (58, -58), (56.75, -58)],
                knots=[0, 0, 0, 1, 1, 1], degree=2, weights=[1, 1, 1]))
            Line((56.75, -58), (58, -58))
            Line((58, -58), (58, -59.25))
        make_face()
        with BuildLine():
            add(Edge.make_bspline(
                [(56.75, -62), (58, -62), (58, -60.75)],
                knots=[0, 0, 0, 1, 1, 1], degree=2, weights=[1, 1, 1]))
            Line((58, -60.75), (58, -62))
            Line((58, -62), (56.75, -62))
        make_face()
        with BuildLine():
            add(Edge.make_bspline(
                [(50, -60.75), (50, -62), (51.25, -62)],
                knots=[0, 0, 0, 1, 1, 1], degree=2, weights=[1, 1, 1]))
            Line((51.25, -62), (50, -62))
            Line((50, -62), (50, -60.75))
        make_face()
    extrude(amount=F2_T3_DEPTH, mode=Mode.SUBTRACT)

    # F2_s6 → F2_t5 (cut)
    with BuildSketch(Plane.XY.offset(-2.1068745702)):
        with BuildLine():
            add(Edge.make_bspline(
                [(2.9072501719, -5.8540496218), (3.75, -5.8540496218), (4.0660311855, -5.0727996218)],
                knots=[0, 0, 0, 1, 1, 1], degree=2, weights=[1, 1, 1]))
            Line((4.0660311855, -5.0727996218), (3.75, -5.8540496218))
            Line((3.75, -5.8540496218), (2.9072501719, -5.8540496218))
        make_face()
        with BuildLine():
            add(Edge.make_bspline(
                [(0.4339688145, -5.0727996218), (0.75, -5.8540496218), (1.5927498281, -5.8540496218)],
                knots=[0, 0, 0, 1, 1, 1], degree=2, weights=[1, 1, 1]))
            Line((1.5927498281, -5.8540496218), (0.75, -5.8540496218))
            Line((0.75, -5.8540496218), (0.4339688145, -5.0727996218))
        make_face()
        with BuildLine():
            add(Edge.make_bspline(
                [(1.5927498281, -38.1459503782), (0.75, -38.1459503782), (0.4339688145, -38.9272003782)],
                knots=[0, 0, 0, 1, 1, 1], degree=2, weights=[1, 1, 1]))
            Line((0.4339688145, -38.9272003782), (0.75, -38.1459503782))
            Line((0.75, -38.1459503782), (1.5927498281, -38.1459503782))
        make_face()
        with BuildLine():
            add(Edge.make_bspline(
                [(4.0660311855, -38.9272003782), (3.75, -38.1459503782), (2.9072501719, -38.1459503782)],
                knots=[0, 0, 0, 1, 1, 1], degree=2, weights=[1, 1, 1]))
            Line((2.9072501719, -38.1459503782), (3.75, -38.1459503782))
            Line((3.75, -38.1459503782), (4.0660311855, -38.9272003782))
        make_face()
    extrude(amount=F2_T5_DEPTH, mode=Mode.SUBTRACT)

    # F2_s8 → F2_t7 (cut)
    with BuildSketch(Plane.XY.offset(-0.6081265759)):
        with BuildLine():
            add(Edge.make_bspline(
                [(0, -3.7567493696), (0, -4), (0.0912189864, -4.2254993696)],
                knots=[0, 0, 0, 1, 1, 1], degree=2, weights=[1, 1, 1]))
            Line((0.0912189864, -4.2254993696), (0, -4))
            Line((0, -4), (0, -3.7567493696))
        make_face()
        with BuildLine():
            add(Edge.make_bspline(
                [(0.0912189864, -39.7745006304), (0, -40), (0, -40.2432506304)],
                knots=[0, 0, 0, 1, 1, 1], degree=2, weights=[1, 1, 1]))
            Line((0, -40.2432506304), (0, -40))
            Line((0, -40), (0.0912189864, -39.7745006304))
        make_face()
    extrude(amount=F2_T7_DEPTH, mode=Mode.SUBTRACT)

    # F2_s10 → F2_t9 (cut)
    with BuildSketch(Plane.XY.offset(-4.9052674285)):
        with BuildLine():
            add(Edge.make_bspline(
                [(41.5707777624, -168.7782728272), (42.4, -167), (40.4378930286, -167)],
                knots=[0, 0, 0, 1, 1, 1], degree=2, weights=[1, 1, 1]))
            Line((40.4378930286, -167), (42.4, -167))
            Line((42.4, -167), (41.5707777624, -168.7782728272))
        make_face()
    extrude(amount=F2_T9_DEPTH, mode=Mode.SUBTRACT)

    # F3
    f3_edges = [f1.edges().sort_by_distance(p)[0] for p in [
        (33, -187.158365, 12.5),
    ]]
    fillet(f3_edges, radius=F3_R)


solid = f1.part
